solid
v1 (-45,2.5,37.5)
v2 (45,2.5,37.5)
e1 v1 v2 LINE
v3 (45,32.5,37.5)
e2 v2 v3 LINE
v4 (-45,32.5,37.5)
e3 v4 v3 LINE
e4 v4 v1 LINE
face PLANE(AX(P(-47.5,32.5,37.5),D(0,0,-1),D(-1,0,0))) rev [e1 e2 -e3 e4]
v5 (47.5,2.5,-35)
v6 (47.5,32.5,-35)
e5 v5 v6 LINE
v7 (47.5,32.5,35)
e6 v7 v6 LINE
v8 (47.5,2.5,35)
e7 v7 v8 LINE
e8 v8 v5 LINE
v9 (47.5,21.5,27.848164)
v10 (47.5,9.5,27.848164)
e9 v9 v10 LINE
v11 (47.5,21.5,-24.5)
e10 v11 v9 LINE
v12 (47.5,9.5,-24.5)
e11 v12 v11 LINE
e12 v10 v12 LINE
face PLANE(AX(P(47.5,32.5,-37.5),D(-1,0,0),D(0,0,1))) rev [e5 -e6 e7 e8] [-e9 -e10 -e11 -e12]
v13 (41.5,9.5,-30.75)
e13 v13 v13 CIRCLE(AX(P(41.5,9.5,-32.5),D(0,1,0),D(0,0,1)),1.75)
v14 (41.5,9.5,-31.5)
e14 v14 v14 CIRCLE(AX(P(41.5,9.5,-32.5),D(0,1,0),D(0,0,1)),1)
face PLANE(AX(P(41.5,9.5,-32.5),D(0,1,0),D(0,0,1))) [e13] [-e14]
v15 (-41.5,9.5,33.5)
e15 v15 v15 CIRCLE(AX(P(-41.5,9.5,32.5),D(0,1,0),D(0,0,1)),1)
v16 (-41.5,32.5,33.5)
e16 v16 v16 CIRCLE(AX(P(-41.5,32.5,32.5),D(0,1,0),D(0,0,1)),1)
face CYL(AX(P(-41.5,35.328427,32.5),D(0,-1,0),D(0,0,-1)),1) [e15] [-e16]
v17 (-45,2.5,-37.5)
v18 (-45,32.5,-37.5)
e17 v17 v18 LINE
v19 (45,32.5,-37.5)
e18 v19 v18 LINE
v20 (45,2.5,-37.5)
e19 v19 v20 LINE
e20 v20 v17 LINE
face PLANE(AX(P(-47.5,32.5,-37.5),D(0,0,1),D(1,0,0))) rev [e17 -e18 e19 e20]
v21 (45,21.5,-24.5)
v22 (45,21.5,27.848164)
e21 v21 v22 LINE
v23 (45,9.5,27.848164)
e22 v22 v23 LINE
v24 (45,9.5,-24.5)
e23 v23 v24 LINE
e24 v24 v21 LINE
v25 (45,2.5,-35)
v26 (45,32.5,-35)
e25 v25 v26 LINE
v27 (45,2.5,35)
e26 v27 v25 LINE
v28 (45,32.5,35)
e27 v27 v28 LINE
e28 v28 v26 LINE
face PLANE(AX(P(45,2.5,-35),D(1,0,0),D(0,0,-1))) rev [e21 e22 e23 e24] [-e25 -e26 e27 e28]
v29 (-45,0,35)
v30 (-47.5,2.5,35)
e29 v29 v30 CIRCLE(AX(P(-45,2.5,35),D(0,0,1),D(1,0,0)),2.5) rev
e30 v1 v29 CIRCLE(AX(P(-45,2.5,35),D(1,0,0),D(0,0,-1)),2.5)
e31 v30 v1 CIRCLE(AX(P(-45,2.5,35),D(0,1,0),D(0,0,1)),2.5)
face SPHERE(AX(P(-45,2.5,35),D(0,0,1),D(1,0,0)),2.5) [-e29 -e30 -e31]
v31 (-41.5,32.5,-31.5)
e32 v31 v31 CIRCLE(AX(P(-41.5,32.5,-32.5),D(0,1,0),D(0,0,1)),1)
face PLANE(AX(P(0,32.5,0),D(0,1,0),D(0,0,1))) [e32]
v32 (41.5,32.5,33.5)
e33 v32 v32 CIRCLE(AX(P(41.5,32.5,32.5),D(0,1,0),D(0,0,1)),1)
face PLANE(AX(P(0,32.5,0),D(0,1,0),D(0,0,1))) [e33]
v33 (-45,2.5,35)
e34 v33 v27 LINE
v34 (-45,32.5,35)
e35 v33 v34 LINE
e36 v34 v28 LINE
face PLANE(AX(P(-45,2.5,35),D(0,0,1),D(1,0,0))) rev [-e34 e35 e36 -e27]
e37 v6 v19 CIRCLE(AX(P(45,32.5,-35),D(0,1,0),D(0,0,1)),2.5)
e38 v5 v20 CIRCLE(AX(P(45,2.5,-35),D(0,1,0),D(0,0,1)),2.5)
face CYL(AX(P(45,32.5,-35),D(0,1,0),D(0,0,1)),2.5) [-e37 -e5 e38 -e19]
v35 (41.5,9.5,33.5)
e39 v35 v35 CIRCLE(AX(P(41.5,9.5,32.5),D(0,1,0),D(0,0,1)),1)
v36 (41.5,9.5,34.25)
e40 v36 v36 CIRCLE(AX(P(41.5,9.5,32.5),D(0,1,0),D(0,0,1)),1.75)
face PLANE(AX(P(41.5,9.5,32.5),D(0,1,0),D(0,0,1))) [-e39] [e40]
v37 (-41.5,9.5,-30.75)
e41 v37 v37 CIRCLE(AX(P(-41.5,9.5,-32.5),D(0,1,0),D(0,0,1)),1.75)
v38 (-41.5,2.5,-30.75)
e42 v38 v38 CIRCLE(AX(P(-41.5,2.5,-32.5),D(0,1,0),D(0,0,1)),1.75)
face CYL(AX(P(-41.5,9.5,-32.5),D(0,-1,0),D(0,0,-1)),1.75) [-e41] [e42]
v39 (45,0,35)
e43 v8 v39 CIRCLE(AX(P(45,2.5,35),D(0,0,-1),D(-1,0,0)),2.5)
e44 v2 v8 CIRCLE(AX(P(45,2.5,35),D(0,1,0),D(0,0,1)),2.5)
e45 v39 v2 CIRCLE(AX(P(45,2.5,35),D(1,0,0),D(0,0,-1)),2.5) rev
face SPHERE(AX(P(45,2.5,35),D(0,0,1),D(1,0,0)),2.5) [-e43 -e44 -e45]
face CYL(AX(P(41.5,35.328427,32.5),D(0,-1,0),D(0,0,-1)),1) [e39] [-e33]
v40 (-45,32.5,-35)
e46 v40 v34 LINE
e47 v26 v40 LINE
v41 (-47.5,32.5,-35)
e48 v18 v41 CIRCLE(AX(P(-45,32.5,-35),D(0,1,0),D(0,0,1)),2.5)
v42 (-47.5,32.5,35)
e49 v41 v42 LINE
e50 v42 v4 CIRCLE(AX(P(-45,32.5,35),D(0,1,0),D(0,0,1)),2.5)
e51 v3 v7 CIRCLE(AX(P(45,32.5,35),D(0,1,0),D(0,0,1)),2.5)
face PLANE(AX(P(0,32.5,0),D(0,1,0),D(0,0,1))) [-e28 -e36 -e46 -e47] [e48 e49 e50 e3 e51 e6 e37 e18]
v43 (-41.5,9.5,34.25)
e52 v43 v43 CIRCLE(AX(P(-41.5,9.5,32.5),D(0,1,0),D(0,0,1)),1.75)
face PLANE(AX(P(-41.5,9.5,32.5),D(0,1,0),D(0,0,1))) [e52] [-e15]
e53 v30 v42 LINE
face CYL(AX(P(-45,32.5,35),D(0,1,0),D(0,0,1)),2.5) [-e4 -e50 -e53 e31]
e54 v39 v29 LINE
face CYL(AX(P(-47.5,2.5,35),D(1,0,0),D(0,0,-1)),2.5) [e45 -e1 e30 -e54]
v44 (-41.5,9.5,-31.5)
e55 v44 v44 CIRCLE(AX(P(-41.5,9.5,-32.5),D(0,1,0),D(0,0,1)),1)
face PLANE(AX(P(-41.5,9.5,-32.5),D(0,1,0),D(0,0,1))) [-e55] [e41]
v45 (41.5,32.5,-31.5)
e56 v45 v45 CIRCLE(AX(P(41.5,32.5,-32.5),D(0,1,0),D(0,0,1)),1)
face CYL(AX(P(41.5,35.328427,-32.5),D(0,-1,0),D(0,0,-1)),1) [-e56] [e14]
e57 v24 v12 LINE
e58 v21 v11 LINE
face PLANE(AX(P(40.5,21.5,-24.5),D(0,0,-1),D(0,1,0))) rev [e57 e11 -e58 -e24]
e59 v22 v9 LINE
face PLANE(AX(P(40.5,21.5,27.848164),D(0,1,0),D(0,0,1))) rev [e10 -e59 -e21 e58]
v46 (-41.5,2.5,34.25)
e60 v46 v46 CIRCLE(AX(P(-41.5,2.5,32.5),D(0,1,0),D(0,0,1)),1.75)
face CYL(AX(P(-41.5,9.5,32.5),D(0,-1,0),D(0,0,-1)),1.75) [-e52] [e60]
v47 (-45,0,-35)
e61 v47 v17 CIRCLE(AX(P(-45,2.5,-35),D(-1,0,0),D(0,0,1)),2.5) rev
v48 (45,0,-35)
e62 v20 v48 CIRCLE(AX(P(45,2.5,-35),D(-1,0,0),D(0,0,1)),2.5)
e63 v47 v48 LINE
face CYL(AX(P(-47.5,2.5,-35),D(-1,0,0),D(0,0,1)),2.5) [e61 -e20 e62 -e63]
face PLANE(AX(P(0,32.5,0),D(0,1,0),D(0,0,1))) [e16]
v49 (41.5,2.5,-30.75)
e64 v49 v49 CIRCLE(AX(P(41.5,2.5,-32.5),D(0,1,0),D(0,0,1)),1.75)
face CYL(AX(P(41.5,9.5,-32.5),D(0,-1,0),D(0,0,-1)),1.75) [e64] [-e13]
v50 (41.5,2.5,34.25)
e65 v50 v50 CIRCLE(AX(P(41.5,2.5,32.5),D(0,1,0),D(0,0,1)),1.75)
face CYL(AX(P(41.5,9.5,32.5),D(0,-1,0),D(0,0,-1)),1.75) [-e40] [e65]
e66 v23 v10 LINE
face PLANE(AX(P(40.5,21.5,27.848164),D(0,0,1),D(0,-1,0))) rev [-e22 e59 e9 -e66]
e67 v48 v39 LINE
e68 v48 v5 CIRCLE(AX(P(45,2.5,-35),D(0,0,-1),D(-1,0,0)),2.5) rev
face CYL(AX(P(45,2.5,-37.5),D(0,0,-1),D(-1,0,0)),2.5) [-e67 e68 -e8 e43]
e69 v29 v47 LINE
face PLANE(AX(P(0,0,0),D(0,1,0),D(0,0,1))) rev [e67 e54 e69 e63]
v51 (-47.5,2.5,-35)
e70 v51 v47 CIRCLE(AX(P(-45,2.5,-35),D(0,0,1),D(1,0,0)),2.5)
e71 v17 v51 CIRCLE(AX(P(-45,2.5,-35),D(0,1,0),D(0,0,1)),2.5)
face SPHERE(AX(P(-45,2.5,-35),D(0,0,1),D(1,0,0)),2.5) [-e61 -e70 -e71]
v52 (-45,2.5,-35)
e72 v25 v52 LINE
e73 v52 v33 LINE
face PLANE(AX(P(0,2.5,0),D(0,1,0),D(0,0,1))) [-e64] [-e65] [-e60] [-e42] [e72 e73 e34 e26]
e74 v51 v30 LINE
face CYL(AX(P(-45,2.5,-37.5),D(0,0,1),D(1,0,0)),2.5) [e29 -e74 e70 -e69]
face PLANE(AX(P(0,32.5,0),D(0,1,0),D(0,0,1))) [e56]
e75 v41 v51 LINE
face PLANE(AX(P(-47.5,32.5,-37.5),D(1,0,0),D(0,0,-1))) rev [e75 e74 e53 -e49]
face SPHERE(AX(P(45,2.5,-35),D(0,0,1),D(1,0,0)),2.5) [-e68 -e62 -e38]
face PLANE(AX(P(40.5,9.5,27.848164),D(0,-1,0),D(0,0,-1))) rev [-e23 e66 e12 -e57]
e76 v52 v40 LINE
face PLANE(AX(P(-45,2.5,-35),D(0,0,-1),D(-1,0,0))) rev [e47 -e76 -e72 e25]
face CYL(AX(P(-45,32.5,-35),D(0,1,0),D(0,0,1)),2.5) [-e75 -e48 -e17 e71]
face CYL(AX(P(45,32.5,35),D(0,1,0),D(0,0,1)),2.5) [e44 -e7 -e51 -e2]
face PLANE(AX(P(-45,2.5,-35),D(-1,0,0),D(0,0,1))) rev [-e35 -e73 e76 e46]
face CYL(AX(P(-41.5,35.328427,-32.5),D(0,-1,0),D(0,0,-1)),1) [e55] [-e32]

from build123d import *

# Parameters (mm, degrees)
SKETCH1_W           = 95
SKETCH1_H           = 75
BOSS_EXTRUDE1_DEPTH = 32.5
SKETCH2_W           = 90
SKETCH2_H           = 70
CUT_EXTRUDE1_DEPTH  = 30
SKETCH3_R           = 1.75
BOSS_EXTRUDE2_DEPTH = 7
SKETCH4_R           = 1
BOSS_EXTRUDE3_DEPTH = 23
SKETCH5_W           = 52.348164398
SKETCH5_H           = 12
CUT_EXTRUDE2_DEPTH  = 7
FILLET1_R           = 2.5
FILLET2_R           = 2.5
FILLET3_R           = 2.5
FILLET4_R           = 2.5
FILLET5_R           = 2.5


with BuildPart() as part:
    # Sketch1 → Boss-Extrude1 (new body)
    with BuildSketch(Plane(origin=(0, 0, 0), x_dir=(1, 0, 0), z_dir=(0, 1, 0))):
        Rectangle(SKETCH1_W, SKETCH1_H)
    extrude(amount=BOSS_EXTRUDE1_DEPTH)

    # Sketch2 → Cut-Extrude1 (cut)
    with BuildSketch(Plane(origin=(0, 32.5, 0), x_dir=(1, 0, 0), z_dir=(0, 1, 0))):
        Rectangle(SKETCH2_W, SKETCH2_H)
    extrude(amount=-CUT_EXTRUDE1_DEPTH, mode=Mode.SUBTRACT)

    # Sketch3 → Boss-Extrude2 (add)
    with BuildSketch(Plane(origin=(0, 2.5, 0), x_dir=(1, 0, 0), z_dir=(0, 1, 0))):
        with Locations(Location((-41.5, 32.5, 0), (0, 0, 270))):
            Circle(SKETCH3_R)
        with Locations(Location((41.5, 32.5, 0), (0, 0, 270))):
            Circle(SKETCH3_R)
        with Locations(Location((41.5, -32.5, 0), (0, 0, 270))):
            Circle(SKETCH3_R)
        with Locations(Location((-41.5, -32.5, 0), (0, 0, 270))):
            Circle(SKETCH3_R)
    extrude(amount=BOSS_EXTRUDE2_DEPTH)

    # Sketch4 → Boss-Extrude3 (add)
    with BuildSketch(Plane(origin=(0, 9.5, 0), x_dir=(1, 0, 0), z_dir=(0, 1, 0))):
        with Locations(Location((-41.5, 32.5, 0), (0, 0, 270))):
            Circle(SKETCH4_R)
        with Locations(Location((41.5, 32.5, 0), (0, 0, 270))):
            Circle(SKETCH4_R)
        with Locations(Location((41.5, -32.5, 0), (0, 0, 270))):
            Circle(SKETCH4_R)
        with Locations(Location((-41.5, -32.5, 0), (0, 0, 270))):
            Circle(SKETCH4_R)
    extrude(amount=BOSS_EXTRUDE3_DEPTH)

    # Sketch5 → Cut-Extrude2 (cut)
    with BuildSketch(Plane(origin=(47.5, 0, 0), x_dir=(0, 0, -1), z_dir=(1, 0, 0))):
        with Locations((-1.674082199, 15.5)):
            Rectangle(SKETCH5_W, SKETCH5_H)
    extrude(amount=-CUT_EXTRUDE2_DEPTH, mode=Mode.SUBTRACT)

    # Fillet1
    fillet1_edges = [part.edges().sort_by_distance(p)[0] for p in [
        (0, 0, -37.5),
        (47.5, 0, 0),
        (0, 0, 37.5),
        (-47.5, 0, 0),
    ]]
    fillet(fillet1_edges, radius=FILLET1_R)

    # Fillet2
    # the kernel refuses this fillet: 2.5 mm, written as the material it takes off along each edge
    with BuildSketch(Plane(origin=(45, 2.5, 35), x_dir=(0, 0, 1), z_dir=(1, 0, 0))) as fillet2_piece_1_section:
        Polygon((0, 0), (FILLET2_R, 0), (FILLET2_R, FILLET2_R), (0, FILLET2_R), align=None)
    fillet2_piece_1 = extrude(amount=FILLET2_R, mode=Mode.PRIVATE)
    fillet2_piece_1 = fillet2_piece_1 - Plane(origin=(45, 2.5, 35), x_dir=(0, 0.7071067811865475, -0.7071067811865475), z_dir=(1, 0, 0)) * Sphere(FILLET2_R, mode=Mode.PRIVATE)
    add(fillet2_piece_1, mode=Mode.SUBTRACT)
    with BuildSketch(Plane(origin=(47.5, 2.5, 37.5), x_dir=(0, 0, -1), z_dir=(0, 1, 0))) as fillet2_piece_2:
        with BuildLine():
            CenterArc((FILLET2_R, FILLET2_R), FILLET2_R, 180, 90)
            Line((0, FILLET2_R), (0, 0))
            Line((0, 0), (FILLET2_R, 0))
        make_face()
    extrude(amount=36.25, mode=Mode.SUBTRACT)

    # Fillet3
    # the kernel refuses this fillet: 2.5 mm, written as the material it takes off along each edge
    with BuildSketch(Plane(origin=(45, 2.5, -35), x_dir=(1, 0, 0), z_dir=(0, 0, -1))) as fillet3_piece_1_section:
        Polygon((0, 0), (FILLET3_R, 0), (FILLET3_R, FILLET3_R), (0, FILLET3_R), align=None)
    fillet3_piece_1 = extrude(amount=FILLET3_R, mode=Mode.PRIVATE)
    fillet3_piece_1 = fillet3_piece_1 - Plane(origin=(45, 2.5, -35), x_dir=(-0.7071067811865475, 0.7071067811865475, 0), z_dir=(0, 0, -1)) * Sphere(FILLET3_R, mode=Mode.PRIVATE)
    add(fillet3_piece_1, mode=Mode.SUBTRACT)
    with BuildSketch(Plane(origin=(47.5, 2.5, -37.5), x_dir=(-1, 0, 0), z_dir=(0, 1, 0))) as fillet3_piece_2:
        with BuildLine():
            CenterArc((FILLET3_R, FILLET3_R), FILLET3_R, 180, 90)
            Line((0, FILLET3_R), (0, 0))
            Line((0, 0), (FILLET3_R, 0))
        make_face()
    extrude(amount=36.25, mode=Mode.SUBTRACT)

    # Fillet4
    # the kernel refuses this fillet: 2.5 mm, written as the material it takes off along each edge
    with BuildSketch(Plane(origin=(-45, 2.5, -35), x_dir=(-1, 0, 0), z_dir=(0, 0, -1))) as fillet4_piece_1_section:
        Polygon((0, 0), (FILLET4_R, 0), (FILLET4_R, -FILLET4_R), (0, -FILLET4_R), align=None)
    fillet4_piece_1 = extrude(amount=FILLET4_R, mode=Mode.PRIVATE)
    fillet4_piece_1 = fillet4_piece_1 - Plane(origin=(-45, 2.5, -35), x_dir=(0.7071067811865475, 0.7071067811865475, 0), z_dir=(0, 0, -1)) * Sphere(FILLET4_R, mode=Mode.PRIVATE)
    add(fillet4_piece_1, mode=Mode.SUBTRACT)
    with BuildSketch(Plane(origin=(-47.5, 2.5, -37.5), x_dir=(1, 0, 0), z_dir=(0, 1, 0))) as fillet4_piece_2:
        with BuildLine():
            CenterArc((FILLET4_R, -FILLET4_R), FILLET4_R, 90, 90)
            Line((0, -FILLET4_R), (0, 0))
            Line((0, 0), (FILLET4_R, 0))
        make_face()
    extrude(amount=36.25, mode=Mode.SUBTRACT)

    # Fillet5
    # the kernel refuses this fillet: 2.5 mm, written as the material it takes off along each edge
    with BuildSketch(Plane(origin=(-45, 2.5, 35), x_dir=(0, 0, 1), z_dir=(-1, 0, 0))) as fillet5_piece_1_section:
        Polygon((0, 0), (FILLET5_R, 0), (FILLET5_R, -FILLET5_R), (0, -FILLET5_R), align=None)
    fillet5_piece_1 = extrude(amount=FILLET5_R, mode=Mode.PRIVATE)
    fillet5_piece_1 = fillet5_piece_1 - Plane(origin=(-45, 2.5, 35), x_dir=(0, 0.7071067811865475, -0.7071067811865475), z_dir=(-1, 0, 0)) * Sphere(FILLET5_R, mode=Mode.PRIVATE)
    add(fillet5_piece_1, mode=Mode.SUBTRACT)
    with BuildSketch(Plane(origin=(-47.5, 2.5, 37.5), x_dir=(0, 0, -1), z_dir=(0, 1, 0))) as fillet5_piece_2:
        with BuildLine():
            CenterArc((FILLET5_R, -FILLET5_R), FILLET5_R, 90, 90)
            Line((0, -FILLET5_R), (0, 0))
            Line((0, 0), (FILLET5_R, 0))
        make_face()
    extrude(amount=36.25, mode=Mode.SUBTRACT)


solid = part.part
